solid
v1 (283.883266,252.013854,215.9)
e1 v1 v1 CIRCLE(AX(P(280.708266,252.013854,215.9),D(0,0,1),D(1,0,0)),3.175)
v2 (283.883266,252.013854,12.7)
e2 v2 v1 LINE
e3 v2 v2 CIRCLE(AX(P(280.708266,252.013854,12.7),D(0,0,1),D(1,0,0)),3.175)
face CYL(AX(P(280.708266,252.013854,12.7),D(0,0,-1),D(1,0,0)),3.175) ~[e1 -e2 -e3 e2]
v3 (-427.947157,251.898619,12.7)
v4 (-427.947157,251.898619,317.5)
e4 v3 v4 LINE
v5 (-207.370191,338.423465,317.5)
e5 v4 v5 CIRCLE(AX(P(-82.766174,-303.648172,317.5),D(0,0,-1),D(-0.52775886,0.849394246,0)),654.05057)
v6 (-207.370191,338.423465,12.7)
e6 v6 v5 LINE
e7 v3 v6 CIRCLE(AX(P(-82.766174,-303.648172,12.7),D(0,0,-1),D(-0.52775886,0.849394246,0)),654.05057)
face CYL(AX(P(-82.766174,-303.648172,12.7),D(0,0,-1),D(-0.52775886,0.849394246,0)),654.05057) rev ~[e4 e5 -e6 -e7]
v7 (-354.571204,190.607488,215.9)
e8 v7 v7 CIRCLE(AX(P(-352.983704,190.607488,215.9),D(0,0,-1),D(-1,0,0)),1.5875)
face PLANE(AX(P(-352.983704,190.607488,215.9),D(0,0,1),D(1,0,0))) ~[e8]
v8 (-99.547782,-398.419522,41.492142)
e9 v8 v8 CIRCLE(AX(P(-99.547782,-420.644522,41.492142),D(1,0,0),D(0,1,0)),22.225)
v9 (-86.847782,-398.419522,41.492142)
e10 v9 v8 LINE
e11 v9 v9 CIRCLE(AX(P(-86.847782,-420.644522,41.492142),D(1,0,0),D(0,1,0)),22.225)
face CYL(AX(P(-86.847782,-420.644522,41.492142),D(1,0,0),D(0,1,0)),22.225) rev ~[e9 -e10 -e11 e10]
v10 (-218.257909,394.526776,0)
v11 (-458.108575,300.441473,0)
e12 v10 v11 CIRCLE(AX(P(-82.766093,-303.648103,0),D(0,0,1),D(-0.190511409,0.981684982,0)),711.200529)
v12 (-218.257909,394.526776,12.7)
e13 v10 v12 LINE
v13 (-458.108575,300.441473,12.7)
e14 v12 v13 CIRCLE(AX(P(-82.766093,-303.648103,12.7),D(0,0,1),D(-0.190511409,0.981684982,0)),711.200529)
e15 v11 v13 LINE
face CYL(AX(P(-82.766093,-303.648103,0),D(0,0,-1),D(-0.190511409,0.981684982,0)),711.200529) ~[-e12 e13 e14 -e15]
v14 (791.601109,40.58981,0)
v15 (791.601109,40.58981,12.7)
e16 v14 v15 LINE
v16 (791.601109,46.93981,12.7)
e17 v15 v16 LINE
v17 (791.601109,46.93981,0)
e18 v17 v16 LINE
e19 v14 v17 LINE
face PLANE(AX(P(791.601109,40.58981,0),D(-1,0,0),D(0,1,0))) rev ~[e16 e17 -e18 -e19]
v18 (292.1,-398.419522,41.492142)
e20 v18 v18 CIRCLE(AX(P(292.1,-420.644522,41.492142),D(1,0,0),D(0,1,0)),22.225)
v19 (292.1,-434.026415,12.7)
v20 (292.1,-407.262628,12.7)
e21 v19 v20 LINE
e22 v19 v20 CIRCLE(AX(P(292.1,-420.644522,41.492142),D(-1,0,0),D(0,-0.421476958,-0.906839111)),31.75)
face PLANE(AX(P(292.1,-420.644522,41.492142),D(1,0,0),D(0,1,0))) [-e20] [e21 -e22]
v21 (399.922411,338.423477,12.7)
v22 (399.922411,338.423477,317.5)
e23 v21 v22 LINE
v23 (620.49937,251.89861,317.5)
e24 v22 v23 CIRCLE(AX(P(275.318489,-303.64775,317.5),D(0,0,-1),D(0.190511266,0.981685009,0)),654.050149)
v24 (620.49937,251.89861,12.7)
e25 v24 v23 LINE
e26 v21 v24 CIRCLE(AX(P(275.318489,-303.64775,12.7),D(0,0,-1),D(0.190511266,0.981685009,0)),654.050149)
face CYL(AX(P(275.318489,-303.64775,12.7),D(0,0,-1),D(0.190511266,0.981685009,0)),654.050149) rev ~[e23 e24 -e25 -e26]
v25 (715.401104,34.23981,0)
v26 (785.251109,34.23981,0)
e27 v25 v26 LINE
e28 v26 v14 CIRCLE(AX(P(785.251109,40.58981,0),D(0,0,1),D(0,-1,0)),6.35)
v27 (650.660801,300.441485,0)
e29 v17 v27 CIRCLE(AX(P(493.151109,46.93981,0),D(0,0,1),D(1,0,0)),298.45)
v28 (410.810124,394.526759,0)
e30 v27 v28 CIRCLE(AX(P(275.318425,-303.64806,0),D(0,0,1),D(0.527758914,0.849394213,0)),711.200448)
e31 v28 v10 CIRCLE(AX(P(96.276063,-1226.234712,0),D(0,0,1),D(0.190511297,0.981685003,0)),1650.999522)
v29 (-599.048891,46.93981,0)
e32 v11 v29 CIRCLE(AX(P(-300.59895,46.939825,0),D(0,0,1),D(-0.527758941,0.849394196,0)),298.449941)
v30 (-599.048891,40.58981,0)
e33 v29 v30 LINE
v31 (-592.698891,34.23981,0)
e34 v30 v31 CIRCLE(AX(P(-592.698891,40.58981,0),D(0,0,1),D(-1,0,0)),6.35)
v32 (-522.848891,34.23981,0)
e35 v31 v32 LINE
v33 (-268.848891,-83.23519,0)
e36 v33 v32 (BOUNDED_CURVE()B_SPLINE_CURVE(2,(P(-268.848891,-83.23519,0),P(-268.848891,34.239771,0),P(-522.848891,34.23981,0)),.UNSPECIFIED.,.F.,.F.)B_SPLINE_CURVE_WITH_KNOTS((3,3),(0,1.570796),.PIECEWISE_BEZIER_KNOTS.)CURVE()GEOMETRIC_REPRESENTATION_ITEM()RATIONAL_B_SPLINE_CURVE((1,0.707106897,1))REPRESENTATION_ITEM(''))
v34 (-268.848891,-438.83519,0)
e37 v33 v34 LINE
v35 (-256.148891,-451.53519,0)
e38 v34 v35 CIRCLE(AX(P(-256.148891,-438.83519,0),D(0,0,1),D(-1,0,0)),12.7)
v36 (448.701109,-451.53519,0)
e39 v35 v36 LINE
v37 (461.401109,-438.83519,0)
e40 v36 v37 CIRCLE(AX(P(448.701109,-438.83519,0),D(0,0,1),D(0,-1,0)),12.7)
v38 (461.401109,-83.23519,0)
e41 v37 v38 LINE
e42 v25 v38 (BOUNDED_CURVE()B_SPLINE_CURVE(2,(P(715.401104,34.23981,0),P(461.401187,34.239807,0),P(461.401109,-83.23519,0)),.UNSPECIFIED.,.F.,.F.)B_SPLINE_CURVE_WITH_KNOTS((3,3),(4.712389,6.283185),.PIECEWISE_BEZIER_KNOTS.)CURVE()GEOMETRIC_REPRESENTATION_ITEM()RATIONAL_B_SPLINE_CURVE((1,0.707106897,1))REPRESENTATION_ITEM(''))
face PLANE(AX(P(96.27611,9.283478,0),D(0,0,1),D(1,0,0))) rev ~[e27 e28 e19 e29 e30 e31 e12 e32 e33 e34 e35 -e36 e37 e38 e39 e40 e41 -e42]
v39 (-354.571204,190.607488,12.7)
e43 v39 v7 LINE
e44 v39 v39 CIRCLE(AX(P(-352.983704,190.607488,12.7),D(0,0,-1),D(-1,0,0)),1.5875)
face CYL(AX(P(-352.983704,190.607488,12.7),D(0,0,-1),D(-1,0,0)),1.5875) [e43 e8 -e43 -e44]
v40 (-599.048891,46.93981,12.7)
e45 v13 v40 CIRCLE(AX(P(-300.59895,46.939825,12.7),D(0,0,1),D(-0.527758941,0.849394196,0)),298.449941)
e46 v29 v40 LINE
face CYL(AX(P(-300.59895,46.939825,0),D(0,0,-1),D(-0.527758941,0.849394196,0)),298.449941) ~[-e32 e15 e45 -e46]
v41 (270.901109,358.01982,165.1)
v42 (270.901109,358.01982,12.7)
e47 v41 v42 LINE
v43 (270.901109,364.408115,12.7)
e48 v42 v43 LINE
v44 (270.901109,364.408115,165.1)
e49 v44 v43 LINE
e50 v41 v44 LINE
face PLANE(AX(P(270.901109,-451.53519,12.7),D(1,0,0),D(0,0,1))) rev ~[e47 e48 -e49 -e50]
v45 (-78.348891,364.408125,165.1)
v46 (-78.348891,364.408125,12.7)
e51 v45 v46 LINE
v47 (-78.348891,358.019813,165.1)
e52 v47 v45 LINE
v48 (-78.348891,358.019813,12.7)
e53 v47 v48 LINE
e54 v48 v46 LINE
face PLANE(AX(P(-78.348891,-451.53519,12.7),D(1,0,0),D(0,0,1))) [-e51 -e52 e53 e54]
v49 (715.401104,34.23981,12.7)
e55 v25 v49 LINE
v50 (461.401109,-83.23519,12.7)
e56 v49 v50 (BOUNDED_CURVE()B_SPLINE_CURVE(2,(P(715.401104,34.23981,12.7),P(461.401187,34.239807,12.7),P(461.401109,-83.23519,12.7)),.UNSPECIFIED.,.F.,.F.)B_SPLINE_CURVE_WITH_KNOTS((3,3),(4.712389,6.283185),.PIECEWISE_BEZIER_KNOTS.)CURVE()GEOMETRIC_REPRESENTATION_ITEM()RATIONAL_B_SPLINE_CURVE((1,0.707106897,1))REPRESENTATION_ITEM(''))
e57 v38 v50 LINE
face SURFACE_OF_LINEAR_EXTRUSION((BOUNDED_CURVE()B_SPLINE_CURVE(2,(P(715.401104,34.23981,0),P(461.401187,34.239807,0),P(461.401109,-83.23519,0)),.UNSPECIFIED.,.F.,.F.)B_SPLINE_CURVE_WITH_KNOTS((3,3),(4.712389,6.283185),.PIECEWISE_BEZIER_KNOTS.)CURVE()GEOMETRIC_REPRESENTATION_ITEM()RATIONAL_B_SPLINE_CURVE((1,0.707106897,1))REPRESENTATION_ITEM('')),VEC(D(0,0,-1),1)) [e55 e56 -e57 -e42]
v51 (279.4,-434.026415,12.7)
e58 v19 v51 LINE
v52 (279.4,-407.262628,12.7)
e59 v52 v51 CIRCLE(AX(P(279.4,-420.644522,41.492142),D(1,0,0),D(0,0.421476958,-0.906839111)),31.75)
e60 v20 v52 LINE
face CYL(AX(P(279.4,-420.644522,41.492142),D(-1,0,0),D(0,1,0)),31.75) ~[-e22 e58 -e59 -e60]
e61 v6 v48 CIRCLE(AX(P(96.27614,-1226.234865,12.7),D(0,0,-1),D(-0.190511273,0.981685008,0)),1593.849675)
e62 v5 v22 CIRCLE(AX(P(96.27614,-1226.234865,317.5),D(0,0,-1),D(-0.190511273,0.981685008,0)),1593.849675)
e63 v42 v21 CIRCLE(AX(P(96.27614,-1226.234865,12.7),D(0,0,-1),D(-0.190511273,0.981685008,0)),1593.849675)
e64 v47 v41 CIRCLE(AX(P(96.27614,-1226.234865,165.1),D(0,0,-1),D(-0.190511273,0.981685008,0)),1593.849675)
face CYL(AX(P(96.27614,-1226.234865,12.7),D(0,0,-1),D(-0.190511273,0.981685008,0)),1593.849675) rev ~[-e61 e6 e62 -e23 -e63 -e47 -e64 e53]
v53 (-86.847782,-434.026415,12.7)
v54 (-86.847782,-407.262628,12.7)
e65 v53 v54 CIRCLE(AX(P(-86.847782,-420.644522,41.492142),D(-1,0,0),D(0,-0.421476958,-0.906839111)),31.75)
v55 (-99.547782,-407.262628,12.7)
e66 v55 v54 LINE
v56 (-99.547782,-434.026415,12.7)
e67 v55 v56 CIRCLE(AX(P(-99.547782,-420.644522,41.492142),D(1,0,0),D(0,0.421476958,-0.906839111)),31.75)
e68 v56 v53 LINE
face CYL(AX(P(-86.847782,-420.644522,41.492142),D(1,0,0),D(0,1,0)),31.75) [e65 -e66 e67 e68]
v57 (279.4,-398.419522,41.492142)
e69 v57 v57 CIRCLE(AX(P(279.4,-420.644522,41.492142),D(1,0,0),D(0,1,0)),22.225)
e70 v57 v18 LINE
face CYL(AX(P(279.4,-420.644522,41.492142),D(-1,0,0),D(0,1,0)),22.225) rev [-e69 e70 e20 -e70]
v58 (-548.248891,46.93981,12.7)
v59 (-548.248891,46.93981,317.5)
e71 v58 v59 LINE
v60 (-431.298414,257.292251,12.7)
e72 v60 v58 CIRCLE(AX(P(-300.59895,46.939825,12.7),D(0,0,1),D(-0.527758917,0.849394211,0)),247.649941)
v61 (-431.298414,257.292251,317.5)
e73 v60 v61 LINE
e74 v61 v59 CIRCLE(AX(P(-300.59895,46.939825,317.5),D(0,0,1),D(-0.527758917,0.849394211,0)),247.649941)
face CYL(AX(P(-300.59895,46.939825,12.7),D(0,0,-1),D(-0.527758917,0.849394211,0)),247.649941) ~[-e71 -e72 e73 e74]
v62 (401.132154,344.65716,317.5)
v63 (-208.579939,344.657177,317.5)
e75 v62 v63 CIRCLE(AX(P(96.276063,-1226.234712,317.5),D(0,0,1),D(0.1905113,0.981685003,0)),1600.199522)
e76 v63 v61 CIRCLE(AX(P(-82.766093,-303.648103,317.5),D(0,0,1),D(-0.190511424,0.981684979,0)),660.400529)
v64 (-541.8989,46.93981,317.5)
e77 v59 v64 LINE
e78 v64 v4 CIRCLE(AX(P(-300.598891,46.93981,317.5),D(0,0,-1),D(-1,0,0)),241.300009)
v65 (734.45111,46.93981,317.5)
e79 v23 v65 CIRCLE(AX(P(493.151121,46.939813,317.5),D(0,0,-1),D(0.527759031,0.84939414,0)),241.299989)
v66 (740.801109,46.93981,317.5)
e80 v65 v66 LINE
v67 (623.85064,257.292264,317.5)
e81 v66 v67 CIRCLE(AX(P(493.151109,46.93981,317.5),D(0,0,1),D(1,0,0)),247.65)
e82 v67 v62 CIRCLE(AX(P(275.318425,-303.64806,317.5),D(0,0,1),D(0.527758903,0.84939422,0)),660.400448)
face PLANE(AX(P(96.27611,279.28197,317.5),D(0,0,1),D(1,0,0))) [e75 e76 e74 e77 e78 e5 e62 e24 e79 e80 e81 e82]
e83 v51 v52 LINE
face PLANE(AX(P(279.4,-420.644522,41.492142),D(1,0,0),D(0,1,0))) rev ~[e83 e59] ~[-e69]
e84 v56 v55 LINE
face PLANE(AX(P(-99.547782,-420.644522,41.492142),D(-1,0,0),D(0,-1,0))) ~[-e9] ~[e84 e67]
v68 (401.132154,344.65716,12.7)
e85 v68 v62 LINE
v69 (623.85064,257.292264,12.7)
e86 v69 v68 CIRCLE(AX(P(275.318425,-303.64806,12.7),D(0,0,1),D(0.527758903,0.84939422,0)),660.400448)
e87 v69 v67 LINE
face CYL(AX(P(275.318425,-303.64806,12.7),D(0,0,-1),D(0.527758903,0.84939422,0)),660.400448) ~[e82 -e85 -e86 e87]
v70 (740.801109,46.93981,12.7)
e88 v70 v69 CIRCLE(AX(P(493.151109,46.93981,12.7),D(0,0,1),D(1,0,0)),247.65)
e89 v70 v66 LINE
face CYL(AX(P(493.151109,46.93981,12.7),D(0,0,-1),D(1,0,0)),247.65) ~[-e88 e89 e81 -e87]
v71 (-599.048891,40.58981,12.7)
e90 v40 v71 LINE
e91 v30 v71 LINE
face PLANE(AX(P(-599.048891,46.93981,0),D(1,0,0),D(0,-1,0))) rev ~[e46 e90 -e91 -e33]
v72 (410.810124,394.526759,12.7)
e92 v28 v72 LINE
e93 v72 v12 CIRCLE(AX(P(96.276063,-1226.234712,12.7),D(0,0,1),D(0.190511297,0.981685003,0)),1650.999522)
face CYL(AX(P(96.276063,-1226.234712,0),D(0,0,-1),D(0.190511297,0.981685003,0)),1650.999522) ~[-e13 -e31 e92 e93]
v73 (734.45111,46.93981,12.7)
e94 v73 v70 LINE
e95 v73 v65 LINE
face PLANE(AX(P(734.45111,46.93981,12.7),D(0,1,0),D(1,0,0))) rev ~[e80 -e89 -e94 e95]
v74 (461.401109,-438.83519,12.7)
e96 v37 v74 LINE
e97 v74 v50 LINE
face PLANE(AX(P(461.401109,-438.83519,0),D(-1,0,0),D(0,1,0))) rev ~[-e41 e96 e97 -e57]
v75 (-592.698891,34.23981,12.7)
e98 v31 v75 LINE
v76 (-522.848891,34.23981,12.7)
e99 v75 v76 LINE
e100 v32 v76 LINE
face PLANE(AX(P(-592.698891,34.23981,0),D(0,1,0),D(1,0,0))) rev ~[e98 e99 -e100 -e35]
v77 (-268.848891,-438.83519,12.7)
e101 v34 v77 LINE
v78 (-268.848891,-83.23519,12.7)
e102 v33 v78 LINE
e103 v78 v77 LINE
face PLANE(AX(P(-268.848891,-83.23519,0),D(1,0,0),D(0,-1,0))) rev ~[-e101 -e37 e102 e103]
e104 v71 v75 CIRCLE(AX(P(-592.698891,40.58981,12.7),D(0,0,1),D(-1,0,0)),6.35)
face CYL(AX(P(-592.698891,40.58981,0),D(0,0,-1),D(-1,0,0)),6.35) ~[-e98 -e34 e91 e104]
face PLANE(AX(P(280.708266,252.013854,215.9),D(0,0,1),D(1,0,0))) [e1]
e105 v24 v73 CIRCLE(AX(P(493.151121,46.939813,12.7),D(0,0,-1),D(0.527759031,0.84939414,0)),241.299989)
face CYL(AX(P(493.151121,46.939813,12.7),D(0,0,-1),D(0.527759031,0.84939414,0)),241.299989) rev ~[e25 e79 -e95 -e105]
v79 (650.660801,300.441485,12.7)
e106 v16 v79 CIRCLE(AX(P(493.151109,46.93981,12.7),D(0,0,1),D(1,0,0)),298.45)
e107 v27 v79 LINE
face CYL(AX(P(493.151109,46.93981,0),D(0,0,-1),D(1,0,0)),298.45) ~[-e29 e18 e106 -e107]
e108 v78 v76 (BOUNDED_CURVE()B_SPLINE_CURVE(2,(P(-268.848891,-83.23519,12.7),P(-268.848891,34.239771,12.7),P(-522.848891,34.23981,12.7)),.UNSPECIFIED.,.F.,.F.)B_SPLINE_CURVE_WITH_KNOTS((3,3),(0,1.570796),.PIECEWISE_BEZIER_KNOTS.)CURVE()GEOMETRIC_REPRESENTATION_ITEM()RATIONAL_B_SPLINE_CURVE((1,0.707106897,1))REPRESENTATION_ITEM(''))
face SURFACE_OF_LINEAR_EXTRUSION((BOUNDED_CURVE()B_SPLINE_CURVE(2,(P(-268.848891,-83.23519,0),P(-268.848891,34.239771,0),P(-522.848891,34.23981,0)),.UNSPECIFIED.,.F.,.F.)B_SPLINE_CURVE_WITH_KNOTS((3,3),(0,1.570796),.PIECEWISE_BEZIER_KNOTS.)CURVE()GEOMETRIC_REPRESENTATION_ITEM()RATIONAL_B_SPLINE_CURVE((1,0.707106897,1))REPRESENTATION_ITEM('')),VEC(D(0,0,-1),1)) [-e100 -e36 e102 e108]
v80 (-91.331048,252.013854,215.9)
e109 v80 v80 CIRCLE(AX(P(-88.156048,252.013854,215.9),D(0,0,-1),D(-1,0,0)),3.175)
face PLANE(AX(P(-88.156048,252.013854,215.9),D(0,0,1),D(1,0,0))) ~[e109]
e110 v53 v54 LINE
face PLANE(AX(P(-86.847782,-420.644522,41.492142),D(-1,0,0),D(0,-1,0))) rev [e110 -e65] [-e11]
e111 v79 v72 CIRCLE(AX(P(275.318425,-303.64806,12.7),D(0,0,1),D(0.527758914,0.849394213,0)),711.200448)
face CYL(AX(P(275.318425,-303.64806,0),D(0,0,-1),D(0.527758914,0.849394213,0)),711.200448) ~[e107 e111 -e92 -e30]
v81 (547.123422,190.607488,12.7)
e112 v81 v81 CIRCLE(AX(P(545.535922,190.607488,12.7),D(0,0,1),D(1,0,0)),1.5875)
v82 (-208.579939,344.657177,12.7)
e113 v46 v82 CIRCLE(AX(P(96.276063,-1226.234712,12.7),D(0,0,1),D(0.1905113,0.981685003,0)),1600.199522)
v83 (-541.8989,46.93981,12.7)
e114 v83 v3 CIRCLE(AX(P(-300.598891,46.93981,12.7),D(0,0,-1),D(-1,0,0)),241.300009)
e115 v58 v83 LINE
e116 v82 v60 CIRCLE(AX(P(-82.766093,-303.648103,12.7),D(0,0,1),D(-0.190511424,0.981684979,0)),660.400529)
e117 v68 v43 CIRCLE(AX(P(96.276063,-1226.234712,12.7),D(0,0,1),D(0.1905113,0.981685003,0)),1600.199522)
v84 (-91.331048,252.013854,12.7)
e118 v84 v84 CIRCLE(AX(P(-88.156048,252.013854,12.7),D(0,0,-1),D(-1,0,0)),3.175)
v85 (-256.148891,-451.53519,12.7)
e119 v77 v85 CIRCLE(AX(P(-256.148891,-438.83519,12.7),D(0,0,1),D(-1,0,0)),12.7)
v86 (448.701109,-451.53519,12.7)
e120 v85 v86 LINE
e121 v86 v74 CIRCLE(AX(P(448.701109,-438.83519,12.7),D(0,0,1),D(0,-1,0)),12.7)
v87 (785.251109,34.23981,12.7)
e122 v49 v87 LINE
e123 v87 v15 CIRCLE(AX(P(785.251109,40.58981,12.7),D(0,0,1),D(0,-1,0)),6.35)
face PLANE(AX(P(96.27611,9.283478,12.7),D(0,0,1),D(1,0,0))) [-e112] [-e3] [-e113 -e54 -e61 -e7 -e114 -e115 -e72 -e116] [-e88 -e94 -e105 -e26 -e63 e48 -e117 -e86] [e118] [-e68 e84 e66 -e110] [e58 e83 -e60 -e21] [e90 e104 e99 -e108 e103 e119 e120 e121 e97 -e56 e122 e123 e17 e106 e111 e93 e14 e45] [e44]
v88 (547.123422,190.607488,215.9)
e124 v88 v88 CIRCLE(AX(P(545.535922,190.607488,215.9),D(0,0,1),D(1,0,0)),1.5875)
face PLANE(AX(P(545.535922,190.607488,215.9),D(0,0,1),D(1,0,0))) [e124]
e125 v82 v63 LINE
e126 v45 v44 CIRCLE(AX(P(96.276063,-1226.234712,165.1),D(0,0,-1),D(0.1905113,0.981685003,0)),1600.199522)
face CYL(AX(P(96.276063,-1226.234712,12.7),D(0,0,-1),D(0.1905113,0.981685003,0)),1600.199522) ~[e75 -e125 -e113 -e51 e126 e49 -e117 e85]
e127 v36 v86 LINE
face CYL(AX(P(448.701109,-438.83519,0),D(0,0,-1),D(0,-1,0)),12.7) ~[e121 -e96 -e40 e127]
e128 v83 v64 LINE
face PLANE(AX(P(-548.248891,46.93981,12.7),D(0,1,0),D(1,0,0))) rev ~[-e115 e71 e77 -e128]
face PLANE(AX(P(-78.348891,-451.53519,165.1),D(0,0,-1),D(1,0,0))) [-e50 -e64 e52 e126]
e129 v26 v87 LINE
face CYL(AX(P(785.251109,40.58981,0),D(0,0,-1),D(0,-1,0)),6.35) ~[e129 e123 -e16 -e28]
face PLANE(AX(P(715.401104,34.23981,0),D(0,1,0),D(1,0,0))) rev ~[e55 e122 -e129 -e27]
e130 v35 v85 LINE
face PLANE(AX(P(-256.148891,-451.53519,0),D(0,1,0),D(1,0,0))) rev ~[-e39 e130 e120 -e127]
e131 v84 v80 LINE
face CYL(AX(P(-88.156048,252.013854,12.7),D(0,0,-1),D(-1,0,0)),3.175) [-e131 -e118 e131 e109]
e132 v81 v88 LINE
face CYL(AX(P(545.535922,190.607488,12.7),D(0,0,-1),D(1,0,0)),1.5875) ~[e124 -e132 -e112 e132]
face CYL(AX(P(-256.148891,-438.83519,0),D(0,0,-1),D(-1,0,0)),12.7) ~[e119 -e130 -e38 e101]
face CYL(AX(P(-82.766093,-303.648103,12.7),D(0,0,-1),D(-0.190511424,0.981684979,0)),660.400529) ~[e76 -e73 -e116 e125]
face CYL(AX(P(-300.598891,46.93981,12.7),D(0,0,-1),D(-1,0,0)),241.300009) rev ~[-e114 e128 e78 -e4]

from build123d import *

# Parameters (mm, degrees)
F1_DEPTH  = 12.7
F3_R      = 31.75
F3_R_2    = 22.225
F4_DEPTH  = 12.7
F5_R      = 1.5875
F5_R_2    = 3.175
F6_DEPTH  = 203.2
F10_DEPTH = 304.8
F11_W     = 349.25
F11_H     = 152.4
F12_DEPTH = 876.3010001


# Not quite as in the source:
# - ends of sketch curves that miss each other by under 0.0002 mm in the source are joined
# - a feature of the source that left no trace in its solid (it failed there, or was rolled back) is left out
# - a pattern or mirror of a feature is missing from the dataset's text; its kind, count and spacing are read off the source's solid


with BuildPart() as f1:
    # F0 (on Top) → F1 (new body)
    with BuildSketch(Plane.XY):
        with BuildLine():
            Line((-599.0488908, 46.9398096), (-599.0488908, 40.5898096))
            ThreePointArc((-599.0488908, 40.5898096), (-597.1890188605, 36.0996815395), (-592.6988908, 34.2398096))
            Line((-592.6988908, 34.2398096), (-522.8488908, 34.2398096))
            add(Edge.make_bspline(
                [(-268.8488908, -83.2351904), (-268.8488908, 34.2397712098), (-522.8488908, 34.2398096)],
                knots=[0, 0, 0, 1.570796, 1.570796, 1.570796], degree=2, weights=[1, 0.7071068967, 1]))
            Line((-268.8488908, -83.2351904), (-268.8488908, -438.8351904))
            ThreePointArc((-268.8488908, -438.8351904), (-265.1291469211, -447.8154465211), (-256.1488908, -451.5351904))
            Line((-256.1488908, -451.5351904), (448.7011092, -451.5351904))
            ThreePointArc((448.7011092, -451.5351904), (457.6813653211, -447.8154465211), (461.4011092, -438.8351904))
            Line((461.4011092, -438.8351904), (461.4011092, -83.2351904))
            add(Edge.make_bspline(
                [(715.4011042177, 34.2398096), (461.4011872236, 34.2398072957), (461.4011092, -83.2351904)],
                knots=[4.712389, 4.712389, 4.712389, 6.283185, 6.283185, 6.283185], degree=2, weights=[1, 0.7071068967, 1]))
            Line((715.4011042177, 34.2398096), (785.2511092, 34.2398096))
            ThreePointArc((785.2511092, 34.2398096), (789.7412372605, 36.0996815395), (791.6011092, 40.5898096))
            Line((791.6011092, 40.5898096), (791.6011092, 46.9398096))
            ThreePointArc((791.6011092, 46.9398096), (753.9970119259, 191.9633164225), (650.6608007323, 300.4414852816))
            ThreePointArc((650.6608007323, 300.4414852816), (535.0314824748, 358.4359268507), (410.8101236244, 394.5267587894))
            ThreePointArc((410.8101236244, 394.5267587894), (96.2761092, 424.7648096), (-218.2579085609, 394.5267759822))
            ThreePointArc((-218.2579085609, 394.5267759822), (-342.4792640748, 358.4359268507), (-458.1085745053, 300.4414726845))
            ThreePointArc((-458.1085745053, 300.4414726845), (-561.4447935259, 191.9633164225), (-599.0488908, 46.9398096))
        make_face()
    extrude(amount=F1_DEPTH)

    # F3 (on offset) → F4 (join)
    with BuildSketch(Plane.YZ.offset(279.4)):
        with Locations((-420.6445217133, 41.4921417832)):
            Circle(F3_R)
        with Locations((-420.6445217133, 41.4921417832)):
            Circle(F3_R_2, mode=Mode.SUBTRACT)
    f4 = extrude(amount=F4_DEPTH)

    # F4_copies: F4 across plane
    add(f4.mirror(Plane(origin=(96.276109, 0, 0), x_dir=(0, 0, -1), z_dir=(-1, 0, 0))))

    # F5 (on face) → F6 (join)
    with BuildSketch(Plane.XY.offset(12.7)):
        with Locations((545.5359220505, 190.6074881554)):
            Circle(F5_R)
        with Locations((280.7082656561, 252.0138544033)):
            Circle(F5_R_2)
    f6 = extrude(amount=F6_DEPTH)

    # F6_copies: F6 across plane
    add(f6.mirror(Plane(origin=(96.276109, 0, 0), x_dir=(0, 0, -1), z_dir=(-1, 0, 0))))

    # F9 (on face) → F10 (join)
    with BuildSketch(Plane.XY.offset(12.7)):
        with BuildLine():
            Line((734.4511103495, 46.9398096), (740.8011092, 46.9398096))
            ThreePointArc((740.8011092, 46.9398096), (709.5977093343, 167.2784641974), (623.8506404715, 257.292263889))
            ThreePointArc((623.8506404715, 257.292263889), (516.4805587409, 311.1442444042), (401.1321540941, 344.6571597759))
            ThreePointArc((401.1321540941, 344.6571597759), (96.2761092, 373.9648096), (-208.5799387837, 344.6571770166))
            ThreePointArc((-208.5799387837, 344.6571770166), (-323.9283403409, 311.1442444042), (-431.2984143121, 257.2922512499))
            ThreePointArc((-431.2984143121, 257.2922512499), (-517.0454909343, 167.2784641974), (-548.2488908, 46.9398096))
            Line((-548.2488908, 46.9398096), (-541.8989002521, 46.9398096))
            ThreePointArc((-541.8989002521, 46.9398096), (-511.4955863715, 164.1928622622), (-427.9471570273, 251.8986192435))
            ThreePointArc((-427.9471570273, 251.8986192435), (-321.6094769175, 305.2327893075), (-207.3701905688, 338.4234653923))
            ThreePointArc((-207.3701905688, 338.4234653923), (96.2761092, 367.6148096), (399.9224109615, 338.4234771459))
            ThreePointArc((399.9224109615, 338.4234771459), (514.1616980249, 305.2327962096), (620.4993695539, 251.8986096209))
            ThreePointArc((620.4993695539, 251.8986096209), (704.047797515, 164.1928582278), (734.4511103495, 46.9398096))
        make_face()
    extrude(amount=F10_DEPTH)

    # F11 (on face) → F12 (cut, through all)
    with BuildSketch(Plane.XZ.offset(451.5351904)):
        with Locations((96.2761092, 88.9)):
            Rectangle(F11_W, F11_H)
    extrude(amount=-F12_DEPTH, mode=Mode.SUBTRACT)


solid = f1.part
